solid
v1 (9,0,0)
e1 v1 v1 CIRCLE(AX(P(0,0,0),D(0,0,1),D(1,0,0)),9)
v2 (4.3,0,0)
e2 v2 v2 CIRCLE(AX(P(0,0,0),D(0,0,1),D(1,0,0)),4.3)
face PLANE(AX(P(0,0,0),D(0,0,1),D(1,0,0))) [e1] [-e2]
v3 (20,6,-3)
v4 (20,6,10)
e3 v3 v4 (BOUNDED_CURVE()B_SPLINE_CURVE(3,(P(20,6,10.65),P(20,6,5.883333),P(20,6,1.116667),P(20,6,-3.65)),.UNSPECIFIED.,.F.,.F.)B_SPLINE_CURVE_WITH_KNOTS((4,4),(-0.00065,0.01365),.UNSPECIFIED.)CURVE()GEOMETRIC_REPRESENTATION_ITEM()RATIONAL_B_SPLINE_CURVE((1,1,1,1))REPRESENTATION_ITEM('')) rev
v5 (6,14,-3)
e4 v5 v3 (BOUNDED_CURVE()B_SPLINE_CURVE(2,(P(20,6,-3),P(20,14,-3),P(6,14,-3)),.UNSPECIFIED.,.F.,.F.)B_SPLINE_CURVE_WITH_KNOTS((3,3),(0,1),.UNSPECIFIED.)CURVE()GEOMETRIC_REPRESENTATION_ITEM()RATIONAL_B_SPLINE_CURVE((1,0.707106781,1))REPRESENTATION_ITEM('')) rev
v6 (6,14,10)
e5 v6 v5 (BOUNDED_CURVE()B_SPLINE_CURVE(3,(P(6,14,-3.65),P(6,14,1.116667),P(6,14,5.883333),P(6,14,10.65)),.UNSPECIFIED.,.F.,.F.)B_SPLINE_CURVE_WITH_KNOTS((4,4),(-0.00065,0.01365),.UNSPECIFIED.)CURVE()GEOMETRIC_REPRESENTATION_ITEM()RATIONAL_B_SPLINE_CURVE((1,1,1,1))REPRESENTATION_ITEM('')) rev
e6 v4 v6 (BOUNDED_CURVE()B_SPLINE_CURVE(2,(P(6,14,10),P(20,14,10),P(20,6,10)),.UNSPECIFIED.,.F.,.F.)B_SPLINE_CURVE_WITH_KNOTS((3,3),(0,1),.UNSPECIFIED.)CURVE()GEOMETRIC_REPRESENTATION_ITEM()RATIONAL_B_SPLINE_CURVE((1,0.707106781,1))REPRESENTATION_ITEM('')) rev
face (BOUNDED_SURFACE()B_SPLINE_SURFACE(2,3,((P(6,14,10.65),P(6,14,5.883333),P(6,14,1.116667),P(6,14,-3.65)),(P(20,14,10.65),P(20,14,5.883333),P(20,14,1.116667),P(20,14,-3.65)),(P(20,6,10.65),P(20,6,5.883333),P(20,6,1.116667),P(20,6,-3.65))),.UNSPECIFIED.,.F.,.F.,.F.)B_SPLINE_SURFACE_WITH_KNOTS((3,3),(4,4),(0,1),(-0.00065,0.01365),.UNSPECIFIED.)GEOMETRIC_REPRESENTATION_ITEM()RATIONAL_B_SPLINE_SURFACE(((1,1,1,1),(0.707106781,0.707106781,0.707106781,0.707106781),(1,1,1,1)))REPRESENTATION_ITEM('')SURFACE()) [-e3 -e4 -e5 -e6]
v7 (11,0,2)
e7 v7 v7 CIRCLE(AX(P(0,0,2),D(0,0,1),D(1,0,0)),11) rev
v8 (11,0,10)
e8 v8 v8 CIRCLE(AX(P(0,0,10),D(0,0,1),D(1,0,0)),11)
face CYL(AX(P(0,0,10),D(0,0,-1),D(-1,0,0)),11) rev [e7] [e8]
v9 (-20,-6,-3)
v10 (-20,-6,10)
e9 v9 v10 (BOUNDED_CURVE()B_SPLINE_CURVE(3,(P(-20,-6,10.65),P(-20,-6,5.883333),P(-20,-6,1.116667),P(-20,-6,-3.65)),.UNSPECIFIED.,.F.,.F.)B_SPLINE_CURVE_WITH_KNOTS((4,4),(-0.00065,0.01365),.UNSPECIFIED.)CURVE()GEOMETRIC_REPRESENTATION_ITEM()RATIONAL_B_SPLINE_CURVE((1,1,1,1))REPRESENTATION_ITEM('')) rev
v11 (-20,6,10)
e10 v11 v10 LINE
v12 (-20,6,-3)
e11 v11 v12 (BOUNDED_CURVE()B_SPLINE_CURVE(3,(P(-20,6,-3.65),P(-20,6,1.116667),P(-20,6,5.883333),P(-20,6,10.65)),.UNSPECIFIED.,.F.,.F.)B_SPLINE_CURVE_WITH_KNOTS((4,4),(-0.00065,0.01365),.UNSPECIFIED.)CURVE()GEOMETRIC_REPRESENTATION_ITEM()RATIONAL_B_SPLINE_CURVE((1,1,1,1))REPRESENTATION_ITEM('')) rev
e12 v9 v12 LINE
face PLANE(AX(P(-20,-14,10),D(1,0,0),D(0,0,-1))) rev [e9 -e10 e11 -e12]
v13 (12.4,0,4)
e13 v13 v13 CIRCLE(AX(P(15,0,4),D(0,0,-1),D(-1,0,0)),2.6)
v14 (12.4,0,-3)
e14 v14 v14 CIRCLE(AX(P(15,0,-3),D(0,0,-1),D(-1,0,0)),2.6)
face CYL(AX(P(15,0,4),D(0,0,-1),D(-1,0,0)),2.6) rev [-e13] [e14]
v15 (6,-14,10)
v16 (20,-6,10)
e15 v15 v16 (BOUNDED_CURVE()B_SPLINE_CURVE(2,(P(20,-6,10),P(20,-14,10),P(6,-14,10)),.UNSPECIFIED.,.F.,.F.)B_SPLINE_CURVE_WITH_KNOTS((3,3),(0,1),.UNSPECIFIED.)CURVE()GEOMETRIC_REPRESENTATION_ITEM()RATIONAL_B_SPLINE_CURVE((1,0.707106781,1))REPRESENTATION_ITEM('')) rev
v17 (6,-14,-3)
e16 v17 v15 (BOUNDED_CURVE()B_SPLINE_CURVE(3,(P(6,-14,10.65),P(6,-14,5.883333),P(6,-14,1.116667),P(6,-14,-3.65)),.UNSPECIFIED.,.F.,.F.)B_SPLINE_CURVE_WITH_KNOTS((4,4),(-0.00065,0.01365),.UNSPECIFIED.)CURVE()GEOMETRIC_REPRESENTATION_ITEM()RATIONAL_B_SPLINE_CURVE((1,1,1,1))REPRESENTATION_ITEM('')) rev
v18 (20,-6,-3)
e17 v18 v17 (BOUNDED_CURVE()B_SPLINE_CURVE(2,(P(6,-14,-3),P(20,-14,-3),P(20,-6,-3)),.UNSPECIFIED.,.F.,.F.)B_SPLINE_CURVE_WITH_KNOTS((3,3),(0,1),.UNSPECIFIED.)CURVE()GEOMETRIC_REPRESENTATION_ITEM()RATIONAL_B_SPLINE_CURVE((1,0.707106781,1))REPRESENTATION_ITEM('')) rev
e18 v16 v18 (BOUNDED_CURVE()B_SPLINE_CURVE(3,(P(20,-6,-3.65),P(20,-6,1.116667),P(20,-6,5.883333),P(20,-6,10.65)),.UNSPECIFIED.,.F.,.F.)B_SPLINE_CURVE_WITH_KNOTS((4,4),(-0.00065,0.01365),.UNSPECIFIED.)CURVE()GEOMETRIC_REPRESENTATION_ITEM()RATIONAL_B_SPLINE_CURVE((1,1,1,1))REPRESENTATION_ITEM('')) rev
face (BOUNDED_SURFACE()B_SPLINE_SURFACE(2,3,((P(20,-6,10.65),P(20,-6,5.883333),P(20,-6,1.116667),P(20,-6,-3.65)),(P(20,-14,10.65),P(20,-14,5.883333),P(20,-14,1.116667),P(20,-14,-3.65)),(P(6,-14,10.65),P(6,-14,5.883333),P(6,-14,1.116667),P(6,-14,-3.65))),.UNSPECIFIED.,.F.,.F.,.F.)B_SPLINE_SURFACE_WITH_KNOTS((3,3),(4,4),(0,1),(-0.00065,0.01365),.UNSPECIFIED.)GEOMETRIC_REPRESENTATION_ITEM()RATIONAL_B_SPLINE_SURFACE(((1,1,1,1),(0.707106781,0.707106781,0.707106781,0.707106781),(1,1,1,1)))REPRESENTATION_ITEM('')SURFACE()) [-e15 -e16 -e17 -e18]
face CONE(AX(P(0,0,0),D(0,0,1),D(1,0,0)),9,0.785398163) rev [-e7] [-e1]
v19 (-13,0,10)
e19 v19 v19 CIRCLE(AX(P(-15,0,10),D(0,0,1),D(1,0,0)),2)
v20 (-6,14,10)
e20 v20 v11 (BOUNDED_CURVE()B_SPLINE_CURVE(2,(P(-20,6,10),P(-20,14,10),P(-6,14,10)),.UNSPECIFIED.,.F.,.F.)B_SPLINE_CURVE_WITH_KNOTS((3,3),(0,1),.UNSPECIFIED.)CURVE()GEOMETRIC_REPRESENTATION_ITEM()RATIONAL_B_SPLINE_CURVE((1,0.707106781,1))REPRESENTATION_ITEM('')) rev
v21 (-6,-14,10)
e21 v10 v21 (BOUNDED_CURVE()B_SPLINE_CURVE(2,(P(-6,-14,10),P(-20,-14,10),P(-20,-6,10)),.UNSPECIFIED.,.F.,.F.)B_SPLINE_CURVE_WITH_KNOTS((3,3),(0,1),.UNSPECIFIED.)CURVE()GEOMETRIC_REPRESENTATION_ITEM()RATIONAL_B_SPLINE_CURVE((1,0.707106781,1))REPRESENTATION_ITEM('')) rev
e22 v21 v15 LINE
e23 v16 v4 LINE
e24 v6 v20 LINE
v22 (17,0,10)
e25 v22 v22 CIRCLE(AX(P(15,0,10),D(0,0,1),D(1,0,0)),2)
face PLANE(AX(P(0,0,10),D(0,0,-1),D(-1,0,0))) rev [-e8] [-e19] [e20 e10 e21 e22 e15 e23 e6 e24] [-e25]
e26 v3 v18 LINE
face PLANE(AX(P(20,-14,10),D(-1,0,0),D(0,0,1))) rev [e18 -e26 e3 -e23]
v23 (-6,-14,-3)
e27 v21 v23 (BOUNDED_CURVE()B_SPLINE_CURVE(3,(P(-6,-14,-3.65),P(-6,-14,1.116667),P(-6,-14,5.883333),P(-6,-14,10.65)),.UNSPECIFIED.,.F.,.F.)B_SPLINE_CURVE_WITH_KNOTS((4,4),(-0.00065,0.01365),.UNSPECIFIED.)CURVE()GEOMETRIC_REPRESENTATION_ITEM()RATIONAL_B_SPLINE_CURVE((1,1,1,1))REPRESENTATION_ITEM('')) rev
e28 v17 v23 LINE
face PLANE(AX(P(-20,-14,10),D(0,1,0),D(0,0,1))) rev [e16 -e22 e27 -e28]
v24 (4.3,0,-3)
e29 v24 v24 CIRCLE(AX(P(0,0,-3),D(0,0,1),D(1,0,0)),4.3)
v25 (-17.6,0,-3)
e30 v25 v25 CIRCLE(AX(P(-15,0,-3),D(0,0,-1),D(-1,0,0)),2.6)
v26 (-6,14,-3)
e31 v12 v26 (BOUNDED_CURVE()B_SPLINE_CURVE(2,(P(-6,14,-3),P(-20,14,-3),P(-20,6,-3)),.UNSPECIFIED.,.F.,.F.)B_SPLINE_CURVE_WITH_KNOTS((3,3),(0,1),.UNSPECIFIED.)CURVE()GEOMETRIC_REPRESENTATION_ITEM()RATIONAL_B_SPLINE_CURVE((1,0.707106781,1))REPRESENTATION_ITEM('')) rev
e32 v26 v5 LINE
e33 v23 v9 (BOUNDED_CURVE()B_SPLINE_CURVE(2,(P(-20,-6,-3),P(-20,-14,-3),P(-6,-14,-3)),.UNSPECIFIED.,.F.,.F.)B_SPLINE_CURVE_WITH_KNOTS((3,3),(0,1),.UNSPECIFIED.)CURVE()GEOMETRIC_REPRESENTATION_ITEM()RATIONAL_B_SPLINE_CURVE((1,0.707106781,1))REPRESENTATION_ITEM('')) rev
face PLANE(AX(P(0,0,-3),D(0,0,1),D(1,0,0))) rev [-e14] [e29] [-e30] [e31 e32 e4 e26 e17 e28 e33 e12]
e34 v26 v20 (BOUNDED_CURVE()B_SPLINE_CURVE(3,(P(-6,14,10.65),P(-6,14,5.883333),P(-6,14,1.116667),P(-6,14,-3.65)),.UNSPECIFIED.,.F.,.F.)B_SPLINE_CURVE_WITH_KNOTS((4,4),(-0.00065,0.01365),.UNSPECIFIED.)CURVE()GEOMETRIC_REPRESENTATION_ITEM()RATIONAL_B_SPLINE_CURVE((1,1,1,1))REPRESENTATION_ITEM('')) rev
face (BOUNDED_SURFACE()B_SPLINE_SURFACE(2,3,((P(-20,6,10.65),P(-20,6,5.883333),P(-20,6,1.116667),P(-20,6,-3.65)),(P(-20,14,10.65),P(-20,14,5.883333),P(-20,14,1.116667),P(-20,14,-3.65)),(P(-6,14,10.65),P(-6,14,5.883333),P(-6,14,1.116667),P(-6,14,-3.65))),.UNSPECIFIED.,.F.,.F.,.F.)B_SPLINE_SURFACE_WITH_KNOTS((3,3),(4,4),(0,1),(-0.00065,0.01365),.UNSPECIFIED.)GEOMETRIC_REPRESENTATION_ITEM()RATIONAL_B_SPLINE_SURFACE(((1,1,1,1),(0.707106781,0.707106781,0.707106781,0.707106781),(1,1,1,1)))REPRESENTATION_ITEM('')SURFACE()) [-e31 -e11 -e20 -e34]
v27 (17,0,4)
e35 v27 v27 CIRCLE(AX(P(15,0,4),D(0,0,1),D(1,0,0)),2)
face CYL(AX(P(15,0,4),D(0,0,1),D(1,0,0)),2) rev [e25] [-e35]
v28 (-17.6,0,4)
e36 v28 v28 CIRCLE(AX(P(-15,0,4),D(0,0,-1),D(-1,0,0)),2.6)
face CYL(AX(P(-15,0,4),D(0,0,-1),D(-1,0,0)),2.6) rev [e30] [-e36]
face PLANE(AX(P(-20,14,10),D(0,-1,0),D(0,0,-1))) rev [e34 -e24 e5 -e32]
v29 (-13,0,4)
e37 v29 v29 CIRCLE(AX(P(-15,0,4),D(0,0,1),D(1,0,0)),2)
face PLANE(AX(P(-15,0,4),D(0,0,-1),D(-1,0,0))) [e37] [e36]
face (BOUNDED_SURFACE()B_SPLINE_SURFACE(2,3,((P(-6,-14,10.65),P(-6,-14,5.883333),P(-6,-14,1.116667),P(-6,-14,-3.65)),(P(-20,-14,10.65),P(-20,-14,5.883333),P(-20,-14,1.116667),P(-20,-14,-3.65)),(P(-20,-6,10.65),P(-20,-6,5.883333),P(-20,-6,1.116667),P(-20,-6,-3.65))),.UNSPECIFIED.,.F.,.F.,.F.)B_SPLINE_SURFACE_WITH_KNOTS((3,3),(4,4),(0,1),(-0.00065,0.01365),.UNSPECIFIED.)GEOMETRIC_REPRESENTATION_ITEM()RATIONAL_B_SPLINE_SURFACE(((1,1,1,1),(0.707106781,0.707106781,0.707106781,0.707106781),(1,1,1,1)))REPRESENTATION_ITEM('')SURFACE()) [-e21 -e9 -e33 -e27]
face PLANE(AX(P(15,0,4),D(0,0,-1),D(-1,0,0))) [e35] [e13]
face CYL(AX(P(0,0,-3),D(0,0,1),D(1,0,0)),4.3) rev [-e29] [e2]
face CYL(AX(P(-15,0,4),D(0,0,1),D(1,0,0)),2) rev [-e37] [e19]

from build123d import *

# Parameters (mm, degrees)
SZKIC1_W                    = 40
SZKIC1_H                    = 28
SZKIC1_R                    = 11
DODANIE_WYCI_GNI_CIE1_DEPTH = 10
SZKIC2_W                    = 40
SZKIC2_H                    = 28
DODANIE_WYCI_GNI_CIE2_DEPTH = 3
SFAZOWANIE1_SIZE            = 2
SZKIC3_R                    = 4.3
WYTNIJ_WYCI_GNI_CIE1_DEPTH  = 3
SZKIC4_R                    = 2
WYTNIJ_WYCI_GNI_CIE2_DEPTH  = 6
ZAOKR_GLENIE1_SIZE          = 14
ZAOKR_GLENIE1_SIZE_2        = 8
ZAOKR_GLENIE2_SIZE          = 14
ZAOKR_GLENIE2_SIZE_2        = 8
SZKIC5_R                    = 2.6
WYTNIJ_WYCI_GNI_CIE3_DEPTH  = 7


with BuildPart() as part:
    # Szkic1 → Dodanie-wyciągnięcie1 (new body)
    with BuildSketch(Plane.XY):
        Rectangle(SZKIC1_W, SZKIC1_H)
        Circle(SZKIC1_R, mode=Mode.SUBTRACT)
    extrude(amount=DODANIE_WYCI_GNI_CIE1_DEPTH)

    # Szkic2 → Dodanie-wyciągnięcie2 (add)
    with BuildSketch(Plane(origin=(0, 0, 0), x_dir=(-1, 0, 0), z_dir=(0, 0, -1))):
        Rectangle(SZKIC2_W, SZKIC2_H)
    extrude(amount=DODANIE_WYCI_GNI_CIE2_DEPTH)

    # Sfazowanie1
    sfazowanie1_edges = [part.edges().sort_by_distance(p)[0] for p in [
        (-11, 0, 0),
    ]]
    chamfer(sfazowanie1_edges, length=SFAZOWANIE1_SIZE)

    # Szkic3 → Wytnij-wyciągnięcie1 (cut)
    with BuildSketch(Plane.XY):
        Circle(SZKIC3_R)
    extrude(amount=-WYTNIJ_WYCI_GNI_CIE1_DEPTH, mode=Mode.SUBTRACT)

    # Szkic4 → Wytnij-wyciągnięcie2 (cut)
    with BuildSketch(Plane.XY.offset(10)):
        with Locations((-15, 0)):
            Circle(SZKIC4_R)
        with Locations((15, 0)):
            Circle(SZKIC4_R)
    extrude(amount=-WYTNIJ_WYCI_GNI_CIE2_DEPTH, mode=Mode.SUBTRACT)

    # Zaokrąglenie1
    # an asymmetric fillet: 14, 8 mm, written as the material it takes off along each edge
    with BuildSketch(Plane(origin=(20, -14, -38), x_dir=(-1, 0, 0), z_dir=(0, 0, 1))) as zaokr_glenie1_piece_1:
        with BuildLine():
            Bezier((ZAOKR_GLENIE1_SIZE, 0), (0, 0), (0, -ZAOKR_GLENIE1_SIZE_2), weights=[1, 0.707106781, 1])
            Line((0, -ZAOKR_GLENIE1_SIZE_2), (0, 0))
            Line((0, 0), (ZAOKR_GLENIE1_SIZE, 0))
        make_face()
    extrude(amount=83, mode=Mode.SUBTRACT)
    with BuildSketch(Plane(origin=(-20, 14, 45), x_dir=(0, -1, 0), z_dir=(0, 0, -1))) as zaokr_glenie1_piece_2:
        with BuildLine():
            Bezier((ZAOKR_GLENIE1_SIZE_2, 0), (0, 0), (0, -ZAOKR_GLENIE1_SIZE), weights=[1, 0.707106781, 1])
            Line((0, -ZAOKR_GLENIE1_SIZE), (0, 0))
            Line((0, 0), (ZAOKR_GLENIE1_SIZE_2, 0))
        make_face()
    extrude(amount=83, mode=Mode.SUBTRACT)

    # Zaokrąglenie2
    # an asymmetric fillet: 14, 8 mm, written as the material it takes off along each edge
    with BuildSketch(Plane(origin=(20, 14, -38), x_dir=(-1, 0, 0), z_dir=(0, 0, 1))) as zaokr_glenie2_piece_1:
        with BuildLine():
            Bezier((ZAOKR_GLENIE2_SIZE, 0), (0, 0), (0, ZAOKR_GLENIE2_SIZE_2), weights=[1, 0.707106781, 1])
            Line((0, ZAOKR_GLENIE2_SIZE_2), (0, 0))
            Line((0, 0), (ZAOKR_GLENIE2_SIZE, 0))
        make_face()
    extrude(amount=83, mode=Mode.SUBTRACT)
    with BuildSketch(Plane(origin=(-20, -14, 45), x_dir=(1, 0, 0), z_dir=(0, 0, -1))) as zaokr_glenie2_piece_2:
        with BuildLine():
            Bezier((ZAOKR_GLENIE2_SIZE, 0), (0, 0), (0, -ZAOKR_GLENIE2_SIZE_2), weights=[1, 0.707106781, 1])
            Line((0, -ZAOKR_GLENIE2_SIZE_2), (0, 0))
            Line((0, 0), (ZAOKR_GLENIE2_SIZE, 0))
        make_face()
    extrude(amount=83, mode=Mode.SUBTRACT)

    # Szkic5 → Wytnij-wyciągnięcie3 (cut)
    with BuildSketch(Plane(origin=(0, 0, -3), x_dir=(-1, 0, 0), z_dir=(0, 0, -1))):
        with Locations((-15, 0)):
            Circle(SZKIC5_R)
        with Locations((15, 0)):
            Circle(SZKIC5_R)
    extrude(amount=-WYTNIJ_WYCI_GNI_CIE3_DEPTH, mode=Mode.SUBTRACT)


solid = part.part
